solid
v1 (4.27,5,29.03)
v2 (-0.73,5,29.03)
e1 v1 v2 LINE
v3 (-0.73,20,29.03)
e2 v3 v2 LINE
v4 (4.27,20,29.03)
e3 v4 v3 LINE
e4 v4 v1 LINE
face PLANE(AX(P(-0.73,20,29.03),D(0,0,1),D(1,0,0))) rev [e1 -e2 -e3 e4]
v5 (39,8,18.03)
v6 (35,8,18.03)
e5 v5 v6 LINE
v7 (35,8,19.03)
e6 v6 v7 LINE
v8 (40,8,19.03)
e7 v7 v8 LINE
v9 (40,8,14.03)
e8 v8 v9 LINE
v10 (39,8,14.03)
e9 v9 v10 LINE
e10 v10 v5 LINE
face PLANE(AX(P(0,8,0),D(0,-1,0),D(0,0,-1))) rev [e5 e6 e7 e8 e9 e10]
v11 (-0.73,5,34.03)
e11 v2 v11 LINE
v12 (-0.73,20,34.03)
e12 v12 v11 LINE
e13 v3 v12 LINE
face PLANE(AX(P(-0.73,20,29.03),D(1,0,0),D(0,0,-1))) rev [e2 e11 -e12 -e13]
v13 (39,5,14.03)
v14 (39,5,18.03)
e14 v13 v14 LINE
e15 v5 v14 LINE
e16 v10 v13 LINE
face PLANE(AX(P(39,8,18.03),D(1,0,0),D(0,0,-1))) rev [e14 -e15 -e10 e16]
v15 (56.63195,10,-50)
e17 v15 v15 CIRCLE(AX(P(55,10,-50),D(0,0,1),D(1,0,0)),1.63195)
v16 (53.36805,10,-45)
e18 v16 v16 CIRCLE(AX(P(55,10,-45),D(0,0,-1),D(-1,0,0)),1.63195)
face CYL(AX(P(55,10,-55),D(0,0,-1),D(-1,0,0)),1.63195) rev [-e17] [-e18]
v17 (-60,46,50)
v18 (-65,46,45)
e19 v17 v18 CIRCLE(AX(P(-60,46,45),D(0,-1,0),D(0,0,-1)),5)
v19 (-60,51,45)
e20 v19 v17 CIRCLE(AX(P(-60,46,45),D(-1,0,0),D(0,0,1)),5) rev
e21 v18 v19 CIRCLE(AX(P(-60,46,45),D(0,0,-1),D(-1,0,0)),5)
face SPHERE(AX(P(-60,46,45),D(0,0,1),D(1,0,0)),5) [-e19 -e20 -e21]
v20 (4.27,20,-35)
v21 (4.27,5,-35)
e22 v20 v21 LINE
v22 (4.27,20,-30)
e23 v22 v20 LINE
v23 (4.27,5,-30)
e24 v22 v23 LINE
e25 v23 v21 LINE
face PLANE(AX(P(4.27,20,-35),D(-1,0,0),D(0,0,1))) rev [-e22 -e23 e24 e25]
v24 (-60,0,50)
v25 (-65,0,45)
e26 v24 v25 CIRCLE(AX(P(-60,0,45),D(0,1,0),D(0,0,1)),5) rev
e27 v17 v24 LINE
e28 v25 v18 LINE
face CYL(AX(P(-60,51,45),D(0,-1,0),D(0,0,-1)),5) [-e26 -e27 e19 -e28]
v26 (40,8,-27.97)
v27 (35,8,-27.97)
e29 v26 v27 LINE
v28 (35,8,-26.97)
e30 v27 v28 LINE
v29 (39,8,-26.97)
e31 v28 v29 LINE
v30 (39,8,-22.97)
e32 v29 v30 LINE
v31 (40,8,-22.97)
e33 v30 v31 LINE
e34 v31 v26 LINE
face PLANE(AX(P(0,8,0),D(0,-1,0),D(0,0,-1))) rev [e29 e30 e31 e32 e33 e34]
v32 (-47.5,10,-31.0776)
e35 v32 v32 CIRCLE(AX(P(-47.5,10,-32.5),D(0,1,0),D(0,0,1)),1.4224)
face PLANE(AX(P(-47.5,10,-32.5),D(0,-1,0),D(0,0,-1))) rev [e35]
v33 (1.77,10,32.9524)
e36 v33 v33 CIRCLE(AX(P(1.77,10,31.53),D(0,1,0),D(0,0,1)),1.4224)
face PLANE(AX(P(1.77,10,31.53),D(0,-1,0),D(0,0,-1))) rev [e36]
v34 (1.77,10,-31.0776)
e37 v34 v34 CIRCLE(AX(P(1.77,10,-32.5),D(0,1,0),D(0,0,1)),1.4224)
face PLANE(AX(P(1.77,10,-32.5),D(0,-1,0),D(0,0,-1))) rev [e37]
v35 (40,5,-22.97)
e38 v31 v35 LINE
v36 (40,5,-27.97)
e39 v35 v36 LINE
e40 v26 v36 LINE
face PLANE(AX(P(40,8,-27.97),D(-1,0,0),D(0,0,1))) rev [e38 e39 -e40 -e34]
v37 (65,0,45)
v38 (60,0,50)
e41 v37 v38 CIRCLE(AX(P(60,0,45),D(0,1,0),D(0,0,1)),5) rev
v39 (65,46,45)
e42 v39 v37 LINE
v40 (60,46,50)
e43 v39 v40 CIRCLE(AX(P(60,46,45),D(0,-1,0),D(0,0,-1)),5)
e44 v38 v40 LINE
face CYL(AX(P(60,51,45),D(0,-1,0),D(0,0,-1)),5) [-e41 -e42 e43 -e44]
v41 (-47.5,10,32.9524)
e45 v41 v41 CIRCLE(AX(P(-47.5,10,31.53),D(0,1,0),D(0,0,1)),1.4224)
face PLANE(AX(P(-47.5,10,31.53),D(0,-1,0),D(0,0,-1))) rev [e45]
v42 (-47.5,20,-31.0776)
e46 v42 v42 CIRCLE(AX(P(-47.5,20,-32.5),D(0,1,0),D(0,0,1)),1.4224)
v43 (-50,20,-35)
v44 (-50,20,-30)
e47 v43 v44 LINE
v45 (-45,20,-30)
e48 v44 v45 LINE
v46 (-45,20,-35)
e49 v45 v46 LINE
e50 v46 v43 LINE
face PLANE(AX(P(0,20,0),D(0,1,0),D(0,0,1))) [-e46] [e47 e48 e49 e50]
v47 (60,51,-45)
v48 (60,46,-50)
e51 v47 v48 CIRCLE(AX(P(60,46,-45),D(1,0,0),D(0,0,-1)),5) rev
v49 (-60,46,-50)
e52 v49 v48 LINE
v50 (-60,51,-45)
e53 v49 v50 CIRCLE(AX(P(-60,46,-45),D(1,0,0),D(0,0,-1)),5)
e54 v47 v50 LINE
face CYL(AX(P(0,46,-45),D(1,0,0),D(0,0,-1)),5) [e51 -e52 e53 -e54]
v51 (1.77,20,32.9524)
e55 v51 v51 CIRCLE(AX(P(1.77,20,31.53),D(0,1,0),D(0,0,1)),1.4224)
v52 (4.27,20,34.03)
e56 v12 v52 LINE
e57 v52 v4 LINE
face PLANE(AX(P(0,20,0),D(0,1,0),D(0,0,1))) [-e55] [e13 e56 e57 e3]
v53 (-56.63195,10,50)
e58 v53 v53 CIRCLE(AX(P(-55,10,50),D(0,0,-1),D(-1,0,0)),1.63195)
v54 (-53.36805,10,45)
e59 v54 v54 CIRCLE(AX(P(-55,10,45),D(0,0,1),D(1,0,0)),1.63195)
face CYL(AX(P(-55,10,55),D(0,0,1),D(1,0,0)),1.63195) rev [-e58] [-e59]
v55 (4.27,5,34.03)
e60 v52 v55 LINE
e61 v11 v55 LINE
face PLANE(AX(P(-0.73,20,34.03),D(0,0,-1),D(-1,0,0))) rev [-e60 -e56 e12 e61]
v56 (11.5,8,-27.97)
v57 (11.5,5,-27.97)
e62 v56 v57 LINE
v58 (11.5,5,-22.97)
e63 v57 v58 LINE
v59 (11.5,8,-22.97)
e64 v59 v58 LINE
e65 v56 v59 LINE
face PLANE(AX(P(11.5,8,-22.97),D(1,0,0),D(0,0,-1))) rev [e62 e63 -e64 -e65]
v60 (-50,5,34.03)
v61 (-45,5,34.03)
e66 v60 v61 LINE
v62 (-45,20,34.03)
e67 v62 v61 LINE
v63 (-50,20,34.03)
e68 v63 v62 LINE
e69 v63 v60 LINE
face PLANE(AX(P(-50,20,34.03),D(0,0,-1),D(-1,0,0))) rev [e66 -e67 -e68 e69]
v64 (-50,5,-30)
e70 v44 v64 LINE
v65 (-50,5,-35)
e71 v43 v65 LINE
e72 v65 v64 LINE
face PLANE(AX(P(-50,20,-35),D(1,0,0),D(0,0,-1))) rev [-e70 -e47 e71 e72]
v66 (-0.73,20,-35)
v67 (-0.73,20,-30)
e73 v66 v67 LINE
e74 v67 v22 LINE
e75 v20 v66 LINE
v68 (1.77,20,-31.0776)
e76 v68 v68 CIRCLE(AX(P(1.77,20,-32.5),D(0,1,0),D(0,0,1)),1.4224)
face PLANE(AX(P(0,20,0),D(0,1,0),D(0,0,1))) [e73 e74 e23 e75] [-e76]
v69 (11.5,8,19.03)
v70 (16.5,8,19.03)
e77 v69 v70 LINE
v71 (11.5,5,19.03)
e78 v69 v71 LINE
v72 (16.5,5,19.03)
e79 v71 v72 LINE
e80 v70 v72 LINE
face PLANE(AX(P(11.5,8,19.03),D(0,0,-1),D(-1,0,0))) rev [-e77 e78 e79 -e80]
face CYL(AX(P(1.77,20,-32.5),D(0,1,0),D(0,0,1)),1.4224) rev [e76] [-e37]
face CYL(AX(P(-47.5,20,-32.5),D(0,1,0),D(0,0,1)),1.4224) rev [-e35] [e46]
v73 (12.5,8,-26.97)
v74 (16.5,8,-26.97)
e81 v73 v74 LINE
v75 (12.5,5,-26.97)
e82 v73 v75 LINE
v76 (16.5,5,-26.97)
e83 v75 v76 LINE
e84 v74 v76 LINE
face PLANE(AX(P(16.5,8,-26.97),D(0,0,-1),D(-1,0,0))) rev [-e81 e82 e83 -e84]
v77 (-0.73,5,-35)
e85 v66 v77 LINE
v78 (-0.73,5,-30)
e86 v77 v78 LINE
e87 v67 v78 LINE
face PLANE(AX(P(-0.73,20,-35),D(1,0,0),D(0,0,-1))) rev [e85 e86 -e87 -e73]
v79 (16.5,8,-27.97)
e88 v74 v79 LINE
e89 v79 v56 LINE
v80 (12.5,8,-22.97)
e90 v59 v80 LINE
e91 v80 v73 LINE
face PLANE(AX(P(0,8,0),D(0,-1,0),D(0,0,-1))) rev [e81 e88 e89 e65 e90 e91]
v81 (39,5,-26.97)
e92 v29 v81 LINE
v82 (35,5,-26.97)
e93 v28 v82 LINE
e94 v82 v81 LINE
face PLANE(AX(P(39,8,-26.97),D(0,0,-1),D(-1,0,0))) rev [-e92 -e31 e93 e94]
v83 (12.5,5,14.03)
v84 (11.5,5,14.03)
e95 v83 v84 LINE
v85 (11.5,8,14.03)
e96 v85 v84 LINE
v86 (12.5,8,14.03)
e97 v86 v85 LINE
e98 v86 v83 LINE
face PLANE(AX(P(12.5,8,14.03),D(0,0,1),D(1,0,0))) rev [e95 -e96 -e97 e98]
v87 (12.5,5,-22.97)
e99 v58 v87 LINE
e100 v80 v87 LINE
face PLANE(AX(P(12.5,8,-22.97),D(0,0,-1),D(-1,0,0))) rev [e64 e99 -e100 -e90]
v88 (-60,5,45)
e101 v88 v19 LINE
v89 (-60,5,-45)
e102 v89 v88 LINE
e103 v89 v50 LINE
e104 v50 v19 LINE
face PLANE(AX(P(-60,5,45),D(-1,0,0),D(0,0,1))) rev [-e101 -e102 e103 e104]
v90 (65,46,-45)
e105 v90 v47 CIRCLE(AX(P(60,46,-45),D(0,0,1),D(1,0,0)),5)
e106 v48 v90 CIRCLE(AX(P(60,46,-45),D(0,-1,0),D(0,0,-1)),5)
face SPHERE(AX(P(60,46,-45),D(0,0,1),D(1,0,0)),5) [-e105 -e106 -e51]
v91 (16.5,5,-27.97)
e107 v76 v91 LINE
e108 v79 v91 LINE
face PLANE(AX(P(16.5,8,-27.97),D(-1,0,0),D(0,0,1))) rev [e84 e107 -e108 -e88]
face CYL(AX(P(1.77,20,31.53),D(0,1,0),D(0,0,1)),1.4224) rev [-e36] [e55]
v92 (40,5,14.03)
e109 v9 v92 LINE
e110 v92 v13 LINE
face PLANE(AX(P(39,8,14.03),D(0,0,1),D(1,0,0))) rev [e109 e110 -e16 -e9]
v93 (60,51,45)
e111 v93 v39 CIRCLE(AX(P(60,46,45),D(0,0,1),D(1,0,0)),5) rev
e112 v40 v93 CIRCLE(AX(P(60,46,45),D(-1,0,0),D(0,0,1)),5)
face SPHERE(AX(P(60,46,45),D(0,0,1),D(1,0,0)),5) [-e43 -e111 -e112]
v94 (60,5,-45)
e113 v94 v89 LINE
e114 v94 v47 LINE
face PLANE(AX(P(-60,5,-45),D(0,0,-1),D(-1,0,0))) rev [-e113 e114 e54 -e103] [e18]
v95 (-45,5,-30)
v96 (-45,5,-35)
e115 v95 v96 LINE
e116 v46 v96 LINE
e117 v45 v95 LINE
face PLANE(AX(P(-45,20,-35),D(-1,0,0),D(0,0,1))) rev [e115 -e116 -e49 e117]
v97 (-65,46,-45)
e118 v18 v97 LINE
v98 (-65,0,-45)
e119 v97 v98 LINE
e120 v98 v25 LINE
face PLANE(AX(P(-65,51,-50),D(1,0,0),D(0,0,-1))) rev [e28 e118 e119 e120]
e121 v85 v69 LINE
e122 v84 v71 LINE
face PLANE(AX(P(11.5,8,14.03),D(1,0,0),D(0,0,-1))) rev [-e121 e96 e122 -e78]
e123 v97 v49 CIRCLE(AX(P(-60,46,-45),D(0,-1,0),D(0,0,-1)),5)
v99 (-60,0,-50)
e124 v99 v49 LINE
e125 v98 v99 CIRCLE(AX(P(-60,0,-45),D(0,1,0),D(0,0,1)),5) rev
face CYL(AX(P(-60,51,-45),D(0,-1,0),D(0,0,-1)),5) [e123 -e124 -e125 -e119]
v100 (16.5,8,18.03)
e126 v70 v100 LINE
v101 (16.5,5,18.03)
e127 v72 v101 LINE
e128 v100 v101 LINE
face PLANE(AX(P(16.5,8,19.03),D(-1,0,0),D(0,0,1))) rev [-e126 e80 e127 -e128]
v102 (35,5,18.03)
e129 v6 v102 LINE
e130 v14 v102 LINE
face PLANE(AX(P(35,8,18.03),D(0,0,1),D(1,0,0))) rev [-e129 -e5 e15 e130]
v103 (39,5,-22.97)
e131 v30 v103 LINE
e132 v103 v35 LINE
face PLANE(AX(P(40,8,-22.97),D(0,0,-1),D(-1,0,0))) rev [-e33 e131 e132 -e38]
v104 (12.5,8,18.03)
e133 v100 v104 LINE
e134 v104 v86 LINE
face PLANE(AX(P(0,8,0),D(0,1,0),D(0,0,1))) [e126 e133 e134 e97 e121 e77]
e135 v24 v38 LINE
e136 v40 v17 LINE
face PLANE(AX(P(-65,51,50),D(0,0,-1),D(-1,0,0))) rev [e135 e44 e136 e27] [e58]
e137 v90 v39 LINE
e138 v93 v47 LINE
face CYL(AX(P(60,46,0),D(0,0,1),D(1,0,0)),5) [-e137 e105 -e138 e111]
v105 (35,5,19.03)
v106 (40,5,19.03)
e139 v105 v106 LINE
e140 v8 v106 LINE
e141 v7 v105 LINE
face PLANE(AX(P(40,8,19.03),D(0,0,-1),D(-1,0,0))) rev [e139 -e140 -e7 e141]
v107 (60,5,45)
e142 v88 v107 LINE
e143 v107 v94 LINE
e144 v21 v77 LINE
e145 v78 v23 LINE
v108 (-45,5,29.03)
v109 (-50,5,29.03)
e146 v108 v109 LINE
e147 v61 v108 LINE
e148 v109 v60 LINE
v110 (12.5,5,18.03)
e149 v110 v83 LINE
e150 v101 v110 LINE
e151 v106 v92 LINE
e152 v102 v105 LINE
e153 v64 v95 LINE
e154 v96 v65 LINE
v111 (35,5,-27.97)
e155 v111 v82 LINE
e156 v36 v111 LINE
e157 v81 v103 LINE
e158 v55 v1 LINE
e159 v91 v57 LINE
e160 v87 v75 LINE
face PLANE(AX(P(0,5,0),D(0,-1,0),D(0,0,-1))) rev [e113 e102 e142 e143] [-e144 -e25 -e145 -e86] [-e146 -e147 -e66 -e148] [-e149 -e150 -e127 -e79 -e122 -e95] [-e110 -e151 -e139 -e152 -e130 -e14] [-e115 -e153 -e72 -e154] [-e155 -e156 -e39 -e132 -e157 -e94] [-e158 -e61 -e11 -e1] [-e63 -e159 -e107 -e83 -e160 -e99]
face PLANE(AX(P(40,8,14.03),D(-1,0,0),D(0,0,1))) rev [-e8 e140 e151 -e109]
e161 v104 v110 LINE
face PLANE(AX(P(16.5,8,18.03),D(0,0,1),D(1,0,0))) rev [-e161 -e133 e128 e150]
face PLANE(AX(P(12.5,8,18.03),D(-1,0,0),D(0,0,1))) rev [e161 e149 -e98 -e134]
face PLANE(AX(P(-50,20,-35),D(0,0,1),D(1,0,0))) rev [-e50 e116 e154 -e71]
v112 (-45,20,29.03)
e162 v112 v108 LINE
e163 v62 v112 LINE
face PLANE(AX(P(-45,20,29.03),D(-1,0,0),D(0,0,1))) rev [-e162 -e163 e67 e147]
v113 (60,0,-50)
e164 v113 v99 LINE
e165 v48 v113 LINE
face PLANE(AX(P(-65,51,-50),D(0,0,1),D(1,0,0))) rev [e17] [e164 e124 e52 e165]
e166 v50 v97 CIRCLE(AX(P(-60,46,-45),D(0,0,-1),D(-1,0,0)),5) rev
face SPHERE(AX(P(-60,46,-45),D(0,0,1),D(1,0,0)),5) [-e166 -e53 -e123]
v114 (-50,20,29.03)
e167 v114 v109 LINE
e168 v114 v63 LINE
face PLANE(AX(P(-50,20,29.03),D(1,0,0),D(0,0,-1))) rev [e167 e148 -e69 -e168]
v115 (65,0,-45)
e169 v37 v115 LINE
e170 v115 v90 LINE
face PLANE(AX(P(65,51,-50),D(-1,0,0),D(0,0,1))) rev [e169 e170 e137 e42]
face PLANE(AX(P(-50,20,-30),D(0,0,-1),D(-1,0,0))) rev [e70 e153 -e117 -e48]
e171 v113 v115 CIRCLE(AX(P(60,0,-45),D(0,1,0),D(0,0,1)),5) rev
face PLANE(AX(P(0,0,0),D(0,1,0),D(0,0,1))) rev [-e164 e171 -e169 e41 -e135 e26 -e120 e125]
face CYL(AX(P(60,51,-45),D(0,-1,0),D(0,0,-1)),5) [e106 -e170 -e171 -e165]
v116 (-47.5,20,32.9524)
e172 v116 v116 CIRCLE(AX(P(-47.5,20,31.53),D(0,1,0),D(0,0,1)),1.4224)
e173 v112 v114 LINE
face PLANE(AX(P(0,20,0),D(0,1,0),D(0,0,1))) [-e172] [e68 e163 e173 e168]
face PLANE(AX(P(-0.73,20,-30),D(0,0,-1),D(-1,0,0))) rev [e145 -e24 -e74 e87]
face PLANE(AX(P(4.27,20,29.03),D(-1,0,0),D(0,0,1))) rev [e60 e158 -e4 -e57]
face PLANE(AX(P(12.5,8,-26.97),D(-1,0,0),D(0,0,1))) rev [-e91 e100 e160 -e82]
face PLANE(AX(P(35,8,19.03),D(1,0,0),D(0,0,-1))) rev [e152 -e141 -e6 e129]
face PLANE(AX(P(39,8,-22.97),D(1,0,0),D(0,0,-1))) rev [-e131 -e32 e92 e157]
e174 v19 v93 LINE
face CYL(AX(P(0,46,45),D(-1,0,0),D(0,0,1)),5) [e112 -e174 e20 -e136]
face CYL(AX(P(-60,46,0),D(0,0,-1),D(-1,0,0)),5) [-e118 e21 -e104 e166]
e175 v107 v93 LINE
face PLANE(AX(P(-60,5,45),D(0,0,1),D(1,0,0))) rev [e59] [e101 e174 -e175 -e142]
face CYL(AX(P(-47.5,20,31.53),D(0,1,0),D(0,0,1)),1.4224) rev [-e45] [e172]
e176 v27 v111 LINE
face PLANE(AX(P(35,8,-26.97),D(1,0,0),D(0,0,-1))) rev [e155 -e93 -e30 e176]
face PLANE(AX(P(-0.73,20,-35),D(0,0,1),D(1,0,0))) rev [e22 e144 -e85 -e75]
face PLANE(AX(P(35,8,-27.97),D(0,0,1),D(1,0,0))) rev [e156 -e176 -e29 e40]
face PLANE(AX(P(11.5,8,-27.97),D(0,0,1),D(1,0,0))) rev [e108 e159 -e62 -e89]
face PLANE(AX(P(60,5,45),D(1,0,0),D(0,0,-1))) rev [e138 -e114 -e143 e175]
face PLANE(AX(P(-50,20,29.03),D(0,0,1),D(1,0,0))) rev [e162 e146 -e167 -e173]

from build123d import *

# Parameters (mm, degrees)
SKETCH1_W                                         = 130
SKETCH1_H                                         = 100
BOSS_EXTRUDE1_DEPTH                               = 51
SKETCH2_W                                         = 120
SKETCH2_H                                         = 90
CUT_EXTRUDE1_DEPTH                                = 46
FILLET2_R                                         = 5
FILLET4_R                                         = 5
SKETCH6_W                                         = 5
SKETCH6_H                                         = 5
BOSS_EXTRUDE2_DEPTH                               = 15
BOSS_EXTRUDE3_DEPTH                               = 3
F_4_CLEARANCE_HOLE2_D                             = 2.8448
F_4_CLEARANCE_HOLE2_DEPTH                         = 10
CSK_FOR_4_FLAT_HEAD_MACHINE_SCREW_100_D           = 3.2639
CSK_FOR_4_FLAT_HEAD_MACHINE_SCREW_100_DEPTH       = 10
CSK_FOR_4_FLAT_HEAD_MACHINE_SCREW_100_CSINK_D     = 5.715
CSK_FOR_4_FLAT_HEAD_MACHINE_SCREW_100_CSINK_ANGLE = 100
CSK_FOR_4_FLAT_HEAD_MACHINE_SCREW_100_TIP         = 0.980574487
CSK_FOR_4_FLAT_HEAD_MACHINE_SCREW_2_D             = 3.2639
CSK_FOR_4_FLAT_HEAD_MACHINE_SCREW_2_DEPTH         = 10
CSK_FOR_4_FLAT_HEAD_MACHINE_SCREW_2_CSINK_D       = 5.715
CSK_FOR_4_FLAT_HEAD_MACHINE_SCREW_2_CSINK_ANGLE   = 100
CSK_FOR_4_FLAT_HEAD_MACHINE_SCREW_2_TIP           = 0.980574487


# Some blends are built 0.0001 mm under size
with BuildPart() as part:
    # Sketch1 → Boss-Extrude1 (new body)
    with BuildSketch(Plane(origin=(0, 0, 0), x_dir=(1, 0, 0), z_dir=(0, 1, 0))):
        Rectangle(SKETCH1_W, SKETCH1_H)
    extrude(amount=BOSS_EXTRUDE1_DEPTH)

    # Sketch2 → Cut-Extrude1 (cut)
    with BuildSketch(Plane(origin=(0, 51, 0), x_dir=(1, 0, 0), z_dir=(0, 1, 0))):
        Rectangle(SKETCH2_W, SKETCH2_H)
    extrude(amount=-CUT_EXTRUDE1_DEPTH, mode=Mode.SUBTRACT)

    # Fillet2
    fillet2_edges = [part.edges().sort_by_distance(p)[0] for p in [
        (-65, 51, 0),
        (0, 51, 50),
        (65, 51, 0),
        (0, 51, -50),
    ]]
    fillet(fillet2_edges, radius=FILLET2_R - 0.0001)  # a hair under: the kernel refuses the full size

    # Fillet4
    # the kernel refuses this fillet: 5 mm, written as the material it takes off along each edge
    with BuildSketch(Plane(origin=(60, 51, 45), x_dir=(0, 0, 1), z_dir=(-1, 0, 0))) as fillet4_piece_1:
        with BuildLine():
            CenterArc((0.0001, -4.9999), 4.9999, 0, 90)
            Line((5, -4.9999), (5, 0))
            Line((5, 0), (0.0001, 0))
        make_face()
    revolve(axis=Axis((60, 51, 45), (0, 1, 0)), revolution_arc=90, mode=Mode.SUBTRACT)
    with BuildSketch(Plane(origin=(-60, 51, 45), x_dir=(-1, 0, 0), z_dir=(0, 0, -1))) as fillet4_piece_2:
        with BuildLine():
            CenterArc((0.0001, -4.9999), 4.9999, 0, 90)
            Line((5, -4.9999), (5, 0))
            Line((5, 0), (0.0001, 0))
        make_face()
    revolve(axis=Axis((-60, 51, 45), (0, 1, 0)), revolution_arc=90, mode=Mode.SUBTRACT)
    with BuildSketch(Plane(origin=(60, 51, -45), x_dir=(1, 0, 0), z_dir=(0, 0, 1))) as fillet4_piece_3:
        with BuildLine():
            CenterArc((0.0001, -4.9999), 4.9999, 0, 90)
            Line((5, -4.9999), (5, 0))
            Line((5, 0), (0.0001, 0))
        make_face()
    revolve(axis=Axis((60, 51, -45), (0, 1, 0)), revolution_arc=90, mode=Mode.SUBTRACT)
    with BuildSketch(Plane(origin=(-60, 51, -45), x_dir=(0, 0, -1), z_dir=(1, 0, 0))) as fillet4_piece_4:
        with BuildLine():
            CenterArc((0.0001, -4.9999), 4.9999, 0, 90)
            Line((5, -4.9999), (5, 0))
            Line((5, 0), (0.0001, 0))
        make_face()
    revolve(axis=Axis((-60, 51, -45), (0, 1, 0)), revolution_arc=90, mode=Mode.SUBTRACT)
    with BuildSketch(Plane(origin=(-65, -12.5, -50), x_dir=(1, 0, 0), z_dir=(0, 1, 0)), Plane(origin=(-65, -12.5, 50), x_dir=(0, 0, -1), z_dir=(0, 1, 0))) as fillet4_piece_5:
        with BuildLine():
            CenterArc((FILLET4_R, -FILLET4_R), FILLET4_R, 90, 90)
            Line((0, -FILLET4_R), (0, 0))
            Line((0, 0), (FILLET4_R, 0))
        make_face()
    extrude(amount=63.5, mode=Mode.SUBTRACT)
    with BuildSketch(Plane(origin=(65, -12.5, -50), x_dir=(-1, 0, 0), z_dir=(0, 1, 0)), Plane(origin=(65, -12.5, 50), x_dir=(0, 0, -1), z_dir=(0, 1, 0))) as fillet4_piece_6:
        with BuildLine():
            CenterArc((FILLET4_R, FILLET4_R), FILLET4_R, 180, 90)
            Line((0, FILLET4_R), (0, 0))
            Line((0, 0), (FILLET4_R, 0))
        make_face()
    extrude(amount=63.5, mode=Mode.SUBTRACT)

    # Sketch6 → Boss-Extrude2 (add)
    with BuildSketch(Plane(origin=(0, 5, 0), x_dir=(1, 0, 0), z_dir=(0, 1, 0))):
        with Locations((-47.5, 32.5)):
            Rectangle(SKETCH6_W, SKETCH6_H)
        with Locations((-47.5, -31.53)):
            Rectangle(SKETCH6_W, SKETCH6_H)
        with Locations((1.77, 32.5)):
            Rectangle(SKETCH6_W, SKETCH6_H)
        with Locations((1.77, -31.53)):
            Rectangle(SKETCH6_W, SKETCH6_H)
    extrude(amount=BOSS_EXTRUDE2_DEPTH)

    # Sketch9 → Boss-Extrude3 (add)
    with BuildSketch(Plane(origin=(0, 5, 0), x_dir=(1, 0, 0), z_dir=(0, 1, 0))):
        Polygon((11.5, -14.03), (11.5, -19.03), (16.5, -19.03), (16.5, -18.03), (12.5, -18.03), (12.5, -14.03), align=None)
        Polygon((11.5, 27.97), (16.5, 27.97), (16.5, 26.97), (12.5, 26.97), (12.5, 22.97), (11.5, 22.97), align=None)
        Polygon((40, 27.97), (40, 22.97), (39, 22.97), (39, 26.97), (35, 26.97), (35, 27.97), align=None)
        Polygon((40, -19.03), (35, -19.03), (35, -18.03), (39, -18.03), (39, -14.03), (40, -14.03), align=None)
    extrude(amount=BOSS_EXTRUDE3_DEPTH)

    # #4 Clearance Hole2
    with Locations(Plane(origin=(58.965440854, 20, -19.145321972), x_dir=(1, 0, 0), z_dir=(0, 1, 0))):
        with Locations((-106.465440854, -50.675321972), (-57.195440854, -50.675321972), (-57.195440854, 13.354678028), (-106.465440854, 13.354678028)):
            Hole(F_4_CLEARANCE_HOLE2_D / 2, depth=F_4_CLEARANCE_HOLE2_DEPTH)

    # CSK for _4 Flat Head Machine Screw _100
    with Locations(Plane(origin=(58.965440854, 7.381222334, 55), x_dir=(1, 0, 0), z_dir=(0, 0, 1))):
        with Locations((-113.965440854, 2.618777666)):
            CounterSinkHole(CSK_FOR_4_FLAT_HEAD_MACHINE_SCREW_100_D / 2, CSK_FOR_4_FLAT_HEAD_MACHINE_SCREW_100_CSINK_D / 2, depth=CSK_FOR_4_FLAT_HEAD_MACHINE_SCREW_100_DEPTH, counter_sink_angle=CSK_FOR_4_FLAT_HEAD_MACHINE_SCREW_100_CSINK_ANGLE)
            with Locations((0, 0, -(CSK_FOR_4_FLAT_HEAD_MACHINE_SCREW_100_DEPTH + CSK_FOR_4_FLAT_HEAD_MACHINE_SCREW_100_TIP / 2))):  # 118° drill point
                Cone(0, CSK_FOR_4_FLAT_HEAD_MACHINE_SCREW_100_D / 2, CSK_FOR_4_FLAT_HEAD_MACHINE_SCREW_100_TIP, mode=Mode.SUBTRACT)

    # CSK for _4 Flat Head Machine Screw _ 2
    with Locations(Plane(origin=(58.965440854, 7.381222334, -55), x_dir=(-1, 0, 0), z_dir=(0, 0, -1))):
        with Locations((3.965440854, 2.618777666)):
            CounterSinkHole(CSK_FOR_4_FLAT_HEAD_MACHINE_SCREW_2_D / 2, CSK_FOR_4_FLAT_HEAD_MACHINE_SCREW_2_CSINK_D / 2, depth=CSK_FOR_4_FLAT_HEAD_MACHINE_SCREW_2_DEPTH, counter_sink_angle=CSK_FOR_4_FLAT_HEAD_MACHINE_SCREW_2_CSINK_ANGLE)
            with Locations((0, 0, -(CSK_FOR_4_FLAT_HEAD_MACHINE_SCREW_2_DEPTH + CSK_FOR_4_FLAT_HEAD_MACHINE_SCREW_2_TIP / 2))):  # 118° drill point
                Cone(0, CSK_FOR_4_FLAT_HEAD_MACHINE_SCREW_2_D / 2, CSK_FOR_4_FLAT_HEAD_MACHINE_SCREW_2_TIP, mode=Mode.SUBTRACT)


solid = part.part
